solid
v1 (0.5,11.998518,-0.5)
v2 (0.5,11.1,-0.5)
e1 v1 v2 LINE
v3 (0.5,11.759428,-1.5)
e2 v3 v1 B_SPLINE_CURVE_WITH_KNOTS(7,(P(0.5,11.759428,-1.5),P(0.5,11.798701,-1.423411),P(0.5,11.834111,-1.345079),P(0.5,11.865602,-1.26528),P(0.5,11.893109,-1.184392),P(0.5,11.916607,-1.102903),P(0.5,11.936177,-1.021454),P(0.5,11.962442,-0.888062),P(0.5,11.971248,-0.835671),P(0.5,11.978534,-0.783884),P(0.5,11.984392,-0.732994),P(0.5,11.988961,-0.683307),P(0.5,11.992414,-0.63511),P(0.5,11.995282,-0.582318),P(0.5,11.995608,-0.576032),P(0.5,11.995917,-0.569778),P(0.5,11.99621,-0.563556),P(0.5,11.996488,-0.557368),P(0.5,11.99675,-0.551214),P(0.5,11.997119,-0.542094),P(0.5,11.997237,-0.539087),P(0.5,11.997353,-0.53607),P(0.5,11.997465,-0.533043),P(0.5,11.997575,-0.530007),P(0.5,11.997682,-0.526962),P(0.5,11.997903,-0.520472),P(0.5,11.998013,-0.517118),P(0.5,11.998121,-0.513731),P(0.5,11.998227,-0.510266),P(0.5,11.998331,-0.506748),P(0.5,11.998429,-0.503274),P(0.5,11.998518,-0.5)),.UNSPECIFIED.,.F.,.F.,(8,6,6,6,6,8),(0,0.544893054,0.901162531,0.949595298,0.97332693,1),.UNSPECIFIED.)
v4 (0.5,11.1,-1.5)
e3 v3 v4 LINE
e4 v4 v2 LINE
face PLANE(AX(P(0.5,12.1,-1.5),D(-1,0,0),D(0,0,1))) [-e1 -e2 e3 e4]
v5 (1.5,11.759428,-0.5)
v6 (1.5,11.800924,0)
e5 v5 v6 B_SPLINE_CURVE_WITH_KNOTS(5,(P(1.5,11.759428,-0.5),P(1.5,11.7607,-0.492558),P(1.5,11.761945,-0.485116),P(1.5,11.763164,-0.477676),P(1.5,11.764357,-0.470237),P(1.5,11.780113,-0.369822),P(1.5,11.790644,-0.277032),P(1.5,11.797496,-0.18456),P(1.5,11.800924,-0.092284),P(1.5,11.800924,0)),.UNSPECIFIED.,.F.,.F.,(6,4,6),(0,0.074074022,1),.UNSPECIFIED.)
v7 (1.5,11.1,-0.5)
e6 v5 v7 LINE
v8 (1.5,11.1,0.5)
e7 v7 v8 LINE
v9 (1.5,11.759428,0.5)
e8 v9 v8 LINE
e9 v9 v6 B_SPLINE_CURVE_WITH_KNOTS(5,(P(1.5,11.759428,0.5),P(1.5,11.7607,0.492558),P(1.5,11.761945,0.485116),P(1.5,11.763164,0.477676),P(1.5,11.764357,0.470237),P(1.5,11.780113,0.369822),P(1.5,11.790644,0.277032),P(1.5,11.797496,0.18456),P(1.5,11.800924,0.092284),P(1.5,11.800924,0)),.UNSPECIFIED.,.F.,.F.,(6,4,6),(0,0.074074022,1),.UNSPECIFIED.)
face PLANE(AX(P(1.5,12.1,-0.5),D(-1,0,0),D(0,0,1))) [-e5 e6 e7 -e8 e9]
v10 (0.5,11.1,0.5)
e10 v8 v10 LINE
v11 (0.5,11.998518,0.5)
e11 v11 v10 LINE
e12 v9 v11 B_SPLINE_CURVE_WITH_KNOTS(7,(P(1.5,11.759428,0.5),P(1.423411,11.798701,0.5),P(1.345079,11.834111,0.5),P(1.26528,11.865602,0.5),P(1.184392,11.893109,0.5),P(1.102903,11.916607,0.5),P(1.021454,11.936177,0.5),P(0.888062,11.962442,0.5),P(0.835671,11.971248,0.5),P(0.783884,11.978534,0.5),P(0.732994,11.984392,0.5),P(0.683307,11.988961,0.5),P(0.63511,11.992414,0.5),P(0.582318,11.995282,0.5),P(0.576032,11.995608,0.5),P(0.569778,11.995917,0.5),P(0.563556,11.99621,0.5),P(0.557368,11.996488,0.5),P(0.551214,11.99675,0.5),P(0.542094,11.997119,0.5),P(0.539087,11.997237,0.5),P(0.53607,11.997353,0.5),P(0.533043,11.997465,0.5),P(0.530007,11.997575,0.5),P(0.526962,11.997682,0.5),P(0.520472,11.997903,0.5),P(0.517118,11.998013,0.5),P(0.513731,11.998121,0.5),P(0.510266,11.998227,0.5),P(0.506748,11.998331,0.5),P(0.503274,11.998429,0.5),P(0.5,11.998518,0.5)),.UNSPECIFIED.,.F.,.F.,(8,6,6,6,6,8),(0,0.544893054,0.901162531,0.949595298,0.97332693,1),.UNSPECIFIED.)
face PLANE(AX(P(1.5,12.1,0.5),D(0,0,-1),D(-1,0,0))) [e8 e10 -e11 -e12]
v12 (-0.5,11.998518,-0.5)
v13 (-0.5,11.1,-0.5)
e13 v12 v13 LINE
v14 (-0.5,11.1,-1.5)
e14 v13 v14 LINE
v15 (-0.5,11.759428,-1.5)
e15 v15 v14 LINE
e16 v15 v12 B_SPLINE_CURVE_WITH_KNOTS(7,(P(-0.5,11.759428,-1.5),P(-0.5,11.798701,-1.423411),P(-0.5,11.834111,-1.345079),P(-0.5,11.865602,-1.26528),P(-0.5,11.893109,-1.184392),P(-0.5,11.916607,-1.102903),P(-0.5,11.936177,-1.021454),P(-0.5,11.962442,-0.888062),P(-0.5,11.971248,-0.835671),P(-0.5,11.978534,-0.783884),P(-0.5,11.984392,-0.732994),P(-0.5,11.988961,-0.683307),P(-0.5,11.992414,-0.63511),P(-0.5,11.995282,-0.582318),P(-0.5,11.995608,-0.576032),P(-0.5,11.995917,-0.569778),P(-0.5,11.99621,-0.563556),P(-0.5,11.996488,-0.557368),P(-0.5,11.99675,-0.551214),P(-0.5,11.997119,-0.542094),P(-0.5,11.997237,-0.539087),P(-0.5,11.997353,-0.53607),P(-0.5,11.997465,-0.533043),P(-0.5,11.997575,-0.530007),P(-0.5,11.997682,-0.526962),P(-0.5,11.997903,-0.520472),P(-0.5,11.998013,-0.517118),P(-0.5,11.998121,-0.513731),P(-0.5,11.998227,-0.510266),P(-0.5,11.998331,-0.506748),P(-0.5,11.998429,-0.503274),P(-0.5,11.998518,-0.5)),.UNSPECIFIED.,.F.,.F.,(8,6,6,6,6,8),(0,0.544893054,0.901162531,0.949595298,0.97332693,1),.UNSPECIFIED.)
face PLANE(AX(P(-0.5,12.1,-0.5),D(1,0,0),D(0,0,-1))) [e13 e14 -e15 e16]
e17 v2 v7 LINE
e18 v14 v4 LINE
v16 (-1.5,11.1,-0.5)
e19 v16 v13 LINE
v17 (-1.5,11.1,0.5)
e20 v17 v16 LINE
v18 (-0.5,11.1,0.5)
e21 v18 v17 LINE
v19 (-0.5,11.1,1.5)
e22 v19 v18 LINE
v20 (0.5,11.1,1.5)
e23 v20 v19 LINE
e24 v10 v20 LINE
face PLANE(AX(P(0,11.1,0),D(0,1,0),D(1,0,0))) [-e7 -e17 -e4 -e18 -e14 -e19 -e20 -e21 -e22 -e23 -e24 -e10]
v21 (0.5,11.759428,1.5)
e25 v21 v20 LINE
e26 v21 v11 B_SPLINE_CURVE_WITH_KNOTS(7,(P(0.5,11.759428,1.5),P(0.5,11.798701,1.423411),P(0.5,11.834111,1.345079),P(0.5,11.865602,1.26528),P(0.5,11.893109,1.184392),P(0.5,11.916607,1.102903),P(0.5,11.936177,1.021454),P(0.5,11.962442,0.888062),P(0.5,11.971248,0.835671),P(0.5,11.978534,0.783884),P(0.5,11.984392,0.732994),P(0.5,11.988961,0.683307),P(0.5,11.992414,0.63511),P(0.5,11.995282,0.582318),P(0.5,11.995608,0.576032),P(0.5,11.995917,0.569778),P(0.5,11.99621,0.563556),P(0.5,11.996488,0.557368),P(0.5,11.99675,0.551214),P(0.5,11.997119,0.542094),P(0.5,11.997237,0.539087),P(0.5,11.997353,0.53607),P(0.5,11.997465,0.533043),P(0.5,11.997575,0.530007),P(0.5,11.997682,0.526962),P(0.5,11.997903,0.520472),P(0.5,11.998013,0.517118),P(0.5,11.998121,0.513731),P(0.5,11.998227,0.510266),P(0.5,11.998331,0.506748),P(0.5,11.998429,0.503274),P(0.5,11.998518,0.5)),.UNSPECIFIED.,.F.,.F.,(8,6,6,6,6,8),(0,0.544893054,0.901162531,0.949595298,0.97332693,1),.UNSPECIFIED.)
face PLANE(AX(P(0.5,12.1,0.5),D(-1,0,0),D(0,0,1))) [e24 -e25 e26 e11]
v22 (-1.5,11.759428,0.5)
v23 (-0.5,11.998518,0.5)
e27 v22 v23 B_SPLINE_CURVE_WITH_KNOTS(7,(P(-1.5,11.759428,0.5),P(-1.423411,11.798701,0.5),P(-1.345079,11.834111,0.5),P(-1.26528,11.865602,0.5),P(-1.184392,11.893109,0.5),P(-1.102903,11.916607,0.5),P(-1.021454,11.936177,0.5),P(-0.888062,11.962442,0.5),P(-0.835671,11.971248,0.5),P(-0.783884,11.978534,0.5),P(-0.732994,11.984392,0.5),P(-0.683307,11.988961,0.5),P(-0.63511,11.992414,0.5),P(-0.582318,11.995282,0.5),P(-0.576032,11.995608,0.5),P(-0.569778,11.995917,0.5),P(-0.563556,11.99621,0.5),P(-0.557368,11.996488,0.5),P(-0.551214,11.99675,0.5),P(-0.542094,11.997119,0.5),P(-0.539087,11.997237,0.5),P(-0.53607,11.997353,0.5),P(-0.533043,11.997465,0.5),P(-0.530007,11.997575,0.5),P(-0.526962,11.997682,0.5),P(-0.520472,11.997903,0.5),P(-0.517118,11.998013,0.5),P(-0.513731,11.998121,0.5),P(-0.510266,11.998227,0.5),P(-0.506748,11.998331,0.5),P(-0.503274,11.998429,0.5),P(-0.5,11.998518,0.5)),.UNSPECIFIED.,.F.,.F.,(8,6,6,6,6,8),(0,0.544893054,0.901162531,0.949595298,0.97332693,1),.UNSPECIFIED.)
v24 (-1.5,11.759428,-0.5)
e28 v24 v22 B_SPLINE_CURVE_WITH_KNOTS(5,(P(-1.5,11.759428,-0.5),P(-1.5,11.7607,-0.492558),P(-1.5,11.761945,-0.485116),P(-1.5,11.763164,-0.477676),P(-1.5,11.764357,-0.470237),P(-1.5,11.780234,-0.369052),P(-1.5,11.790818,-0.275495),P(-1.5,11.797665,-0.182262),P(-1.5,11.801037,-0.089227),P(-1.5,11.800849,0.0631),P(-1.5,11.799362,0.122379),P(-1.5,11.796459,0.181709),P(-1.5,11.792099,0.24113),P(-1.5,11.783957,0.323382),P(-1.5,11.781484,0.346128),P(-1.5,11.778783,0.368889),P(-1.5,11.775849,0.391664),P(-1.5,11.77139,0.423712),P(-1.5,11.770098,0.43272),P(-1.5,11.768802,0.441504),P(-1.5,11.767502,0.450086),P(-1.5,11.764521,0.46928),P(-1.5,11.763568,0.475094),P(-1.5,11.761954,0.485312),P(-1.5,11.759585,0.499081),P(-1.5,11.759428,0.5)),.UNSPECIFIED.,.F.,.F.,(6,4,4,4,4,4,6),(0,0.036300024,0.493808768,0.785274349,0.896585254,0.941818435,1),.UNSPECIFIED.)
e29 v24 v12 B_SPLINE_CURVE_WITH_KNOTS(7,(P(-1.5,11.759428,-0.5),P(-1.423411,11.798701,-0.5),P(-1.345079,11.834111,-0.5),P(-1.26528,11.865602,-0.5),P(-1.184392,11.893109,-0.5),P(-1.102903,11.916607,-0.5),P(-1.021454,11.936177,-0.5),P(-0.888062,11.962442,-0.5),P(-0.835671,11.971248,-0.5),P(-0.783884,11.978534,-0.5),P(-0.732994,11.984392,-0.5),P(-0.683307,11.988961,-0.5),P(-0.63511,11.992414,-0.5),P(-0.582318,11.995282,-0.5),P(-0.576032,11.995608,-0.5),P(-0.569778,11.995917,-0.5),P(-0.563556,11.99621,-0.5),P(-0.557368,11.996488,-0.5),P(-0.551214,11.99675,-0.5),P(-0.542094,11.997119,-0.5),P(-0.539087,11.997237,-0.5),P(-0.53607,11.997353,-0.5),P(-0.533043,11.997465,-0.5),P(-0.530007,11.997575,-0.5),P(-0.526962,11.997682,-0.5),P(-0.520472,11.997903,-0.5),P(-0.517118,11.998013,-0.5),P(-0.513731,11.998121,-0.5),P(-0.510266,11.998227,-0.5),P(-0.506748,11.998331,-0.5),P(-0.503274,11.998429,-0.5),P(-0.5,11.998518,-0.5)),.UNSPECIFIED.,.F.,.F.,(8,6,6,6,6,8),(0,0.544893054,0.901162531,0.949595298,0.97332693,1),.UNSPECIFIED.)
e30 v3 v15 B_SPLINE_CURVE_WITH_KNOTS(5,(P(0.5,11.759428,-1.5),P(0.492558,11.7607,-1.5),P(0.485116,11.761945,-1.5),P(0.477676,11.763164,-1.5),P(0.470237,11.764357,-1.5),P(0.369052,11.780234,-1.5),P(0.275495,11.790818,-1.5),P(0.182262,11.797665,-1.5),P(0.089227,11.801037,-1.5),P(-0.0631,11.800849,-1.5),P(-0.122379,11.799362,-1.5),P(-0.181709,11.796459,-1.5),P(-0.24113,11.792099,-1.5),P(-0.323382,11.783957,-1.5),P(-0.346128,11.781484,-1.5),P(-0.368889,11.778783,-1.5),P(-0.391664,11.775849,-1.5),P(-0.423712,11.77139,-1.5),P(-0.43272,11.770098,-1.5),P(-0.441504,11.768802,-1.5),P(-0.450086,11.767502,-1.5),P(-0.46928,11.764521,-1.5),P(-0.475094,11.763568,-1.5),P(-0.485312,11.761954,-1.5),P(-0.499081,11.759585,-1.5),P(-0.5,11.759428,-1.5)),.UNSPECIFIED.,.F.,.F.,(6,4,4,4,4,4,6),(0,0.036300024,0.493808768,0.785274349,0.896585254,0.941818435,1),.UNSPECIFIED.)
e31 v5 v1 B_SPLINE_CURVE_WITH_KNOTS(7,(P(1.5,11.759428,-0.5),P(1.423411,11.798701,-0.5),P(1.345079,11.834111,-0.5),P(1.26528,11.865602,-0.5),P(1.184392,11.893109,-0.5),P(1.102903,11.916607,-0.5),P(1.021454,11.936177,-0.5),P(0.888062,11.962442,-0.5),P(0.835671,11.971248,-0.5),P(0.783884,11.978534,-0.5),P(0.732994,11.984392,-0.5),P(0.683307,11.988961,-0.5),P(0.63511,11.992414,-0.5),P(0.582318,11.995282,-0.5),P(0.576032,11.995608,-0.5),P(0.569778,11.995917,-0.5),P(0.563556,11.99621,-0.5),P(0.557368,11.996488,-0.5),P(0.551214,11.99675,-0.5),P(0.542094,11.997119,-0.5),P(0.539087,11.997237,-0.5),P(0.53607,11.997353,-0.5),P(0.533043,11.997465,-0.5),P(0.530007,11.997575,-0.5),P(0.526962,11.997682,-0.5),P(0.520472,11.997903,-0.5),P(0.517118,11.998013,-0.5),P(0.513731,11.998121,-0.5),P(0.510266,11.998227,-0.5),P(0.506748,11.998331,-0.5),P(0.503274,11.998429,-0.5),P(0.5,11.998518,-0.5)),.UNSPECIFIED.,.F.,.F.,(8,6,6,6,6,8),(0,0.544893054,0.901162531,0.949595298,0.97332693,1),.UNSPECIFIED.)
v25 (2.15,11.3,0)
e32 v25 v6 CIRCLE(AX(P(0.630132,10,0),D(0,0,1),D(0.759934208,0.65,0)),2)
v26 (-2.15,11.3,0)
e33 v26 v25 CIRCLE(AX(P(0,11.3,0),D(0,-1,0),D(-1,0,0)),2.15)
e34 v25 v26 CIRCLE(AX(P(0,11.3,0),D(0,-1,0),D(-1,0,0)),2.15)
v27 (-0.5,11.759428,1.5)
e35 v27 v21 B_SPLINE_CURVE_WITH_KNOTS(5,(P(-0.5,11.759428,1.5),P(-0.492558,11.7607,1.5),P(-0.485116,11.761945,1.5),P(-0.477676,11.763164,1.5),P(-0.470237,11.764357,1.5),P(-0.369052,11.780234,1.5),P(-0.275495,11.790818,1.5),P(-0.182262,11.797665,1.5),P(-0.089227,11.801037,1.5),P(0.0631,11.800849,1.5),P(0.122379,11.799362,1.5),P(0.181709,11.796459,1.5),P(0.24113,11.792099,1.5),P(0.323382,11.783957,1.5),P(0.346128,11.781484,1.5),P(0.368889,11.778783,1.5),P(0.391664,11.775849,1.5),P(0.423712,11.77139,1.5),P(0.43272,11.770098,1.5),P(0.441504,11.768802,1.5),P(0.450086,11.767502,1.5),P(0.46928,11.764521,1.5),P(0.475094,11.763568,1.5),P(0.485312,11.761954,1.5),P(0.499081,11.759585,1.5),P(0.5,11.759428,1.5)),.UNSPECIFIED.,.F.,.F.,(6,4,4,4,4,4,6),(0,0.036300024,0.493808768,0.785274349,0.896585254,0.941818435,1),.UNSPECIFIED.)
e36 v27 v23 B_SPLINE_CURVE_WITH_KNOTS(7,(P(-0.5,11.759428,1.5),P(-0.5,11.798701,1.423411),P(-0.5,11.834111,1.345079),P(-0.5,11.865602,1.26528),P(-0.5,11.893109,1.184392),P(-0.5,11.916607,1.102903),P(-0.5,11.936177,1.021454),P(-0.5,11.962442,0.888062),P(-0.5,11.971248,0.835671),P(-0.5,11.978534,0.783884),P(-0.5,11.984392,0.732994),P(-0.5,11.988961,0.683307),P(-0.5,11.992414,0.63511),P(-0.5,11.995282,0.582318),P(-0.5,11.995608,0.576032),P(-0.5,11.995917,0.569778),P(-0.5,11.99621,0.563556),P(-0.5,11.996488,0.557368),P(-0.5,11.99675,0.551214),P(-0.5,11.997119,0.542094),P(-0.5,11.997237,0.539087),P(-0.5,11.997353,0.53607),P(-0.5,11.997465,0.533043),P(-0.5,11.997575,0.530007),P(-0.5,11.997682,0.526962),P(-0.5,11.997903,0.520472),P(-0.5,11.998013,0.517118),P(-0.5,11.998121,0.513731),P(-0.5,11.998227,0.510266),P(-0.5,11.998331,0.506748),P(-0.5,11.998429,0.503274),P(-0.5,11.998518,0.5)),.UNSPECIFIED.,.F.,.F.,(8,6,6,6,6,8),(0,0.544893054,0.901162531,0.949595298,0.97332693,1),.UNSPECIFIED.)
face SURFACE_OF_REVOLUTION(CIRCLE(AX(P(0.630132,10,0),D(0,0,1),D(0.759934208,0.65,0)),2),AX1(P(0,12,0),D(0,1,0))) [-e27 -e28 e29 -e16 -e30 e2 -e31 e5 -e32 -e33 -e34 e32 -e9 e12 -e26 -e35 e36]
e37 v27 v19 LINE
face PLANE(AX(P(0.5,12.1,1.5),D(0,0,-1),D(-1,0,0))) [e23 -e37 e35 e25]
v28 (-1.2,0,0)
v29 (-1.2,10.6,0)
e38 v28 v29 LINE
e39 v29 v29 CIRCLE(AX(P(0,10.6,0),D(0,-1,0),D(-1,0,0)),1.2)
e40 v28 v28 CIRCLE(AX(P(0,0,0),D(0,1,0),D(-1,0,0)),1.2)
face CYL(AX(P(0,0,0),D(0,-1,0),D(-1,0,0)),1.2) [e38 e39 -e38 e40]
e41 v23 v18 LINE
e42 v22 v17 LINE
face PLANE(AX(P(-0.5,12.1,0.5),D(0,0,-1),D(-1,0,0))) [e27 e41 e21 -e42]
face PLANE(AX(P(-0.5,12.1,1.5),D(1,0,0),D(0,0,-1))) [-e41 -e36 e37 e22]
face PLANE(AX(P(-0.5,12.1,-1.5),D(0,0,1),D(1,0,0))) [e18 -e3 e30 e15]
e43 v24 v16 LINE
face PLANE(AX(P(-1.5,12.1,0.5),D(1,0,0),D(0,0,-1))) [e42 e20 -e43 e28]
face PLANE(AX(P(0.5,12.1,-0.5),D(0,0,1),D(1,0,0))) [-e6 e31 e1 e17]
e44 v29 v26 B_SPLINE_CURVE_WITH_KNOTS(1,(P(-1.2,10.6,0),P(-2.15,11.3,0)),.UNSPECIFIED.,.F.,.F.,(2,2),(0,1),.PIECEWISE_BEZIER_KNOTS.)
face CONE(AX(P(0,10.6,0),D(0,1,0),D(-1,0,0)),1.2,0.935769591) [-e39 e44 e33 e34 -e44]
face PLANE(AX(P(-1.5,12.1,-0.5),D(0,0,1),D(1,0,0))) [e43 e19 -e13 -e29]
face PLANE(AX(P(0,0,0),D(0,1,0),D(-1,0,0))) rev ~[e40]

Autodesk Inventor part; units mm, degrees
ref_plane "YZ Plane" through (0, 0, 0) normal (1, 0, 0) x (0, 1, 0)
sketch "Sketch1" plane through (0, 0, 0) normal (0, 1, 0) x (-1, 0, 0)
  circle A0 centre (0, 0) radius 1.2
  dimension "d0" = 2.4
extrude "Extrusion1" add sketch "Sketch1" along normal blind 10.6
thread "Thread1" size "M3x0.5" class "6g" standard "ANSI Metric M Profile" length 10 offset 1
ref_plane "Work Plane1" through (0, 11.3, 0) normal (0, 1, 0) x (1, 0, 0)
sketch "Sketch3" plane through (0, 11.3, 0) normal (0, 1, 0) x (1, 0, 0)
  circle A0 centre (0, 0) radius 2.15
  dimension "d6" = 4.3
loft "Loft1" add profiles "Sketch3" section 1 edges at (1.2, 10.6, 0)
sketch "Sketch5" plane through (0, 11.3, 0) normal (0, 1, 0) x (1, 0, 0)
  circle A0 centre (0, 0) radius 2.15
extrude "Extrusion2" add sketch "Sketch5" along normal blind 0.7
fillet "Fillet1" radius 2 1 edges at (-2.15, 12, 0)
ref_plane "Work Plane2" through (0, 12.1, 0) normal (0, 1, 0) x (1, 0, 0)
sketch "Sketch7" plane through (0, 12.1, 0) normal (0, 1, 0) x (1, 0, 0)
  line L0 (-1.5, -0.5) -> (-1.5, 0.5)
  line L1 (1.5, 0.5) -> (1.5, -0.5)
  line L2 (-0.5, 1.5) -> (0.5, 1.5)
  line L3 (0.5, -1.5) -> (-0.5, -1.5)
  line L4 (1.5, -0.5) -> (0.5, -0.5)
  line L5 (-0.5, -0.5) -> (-1.5, -0.5)
  line L6 (0.5, 1.5) -> (0.5, 0.5)
  line L7 (0.5, -0.5) -> (0.5, -1.5)
  line L8 (-1.5, 0.5) -> (-0.5, 0.5)
  line L9 (0.5, 0.5) -> (1.5, 0.5)
  line L10 (-0.5, -1.5) -> (-0.5, -0.5)
  line L11 (-0.5, 0.5) -> (-0.5, 1.5)
  dimension "d22" = 3
  dimension "d23" = 1
  dimension "d24" = 3
  dimension "d25" = 1
extrude "Extrusion4" cut sketch "Sketch7" against normal blind 1
equation "\"BendRadius\" = Thickness"
equation "\"BendReliefWidth\" = Thickness"
equation "\"BendReliefDepth\" = 0.5 * Thickness"
equation "\"CornerReliefSize\" = 4 * Thickness"
equation "\"MinimumRemnant\" = 2 * Thickness"
equation "\"TransitionRadius\" = BendRadius"
equation "\"JacobiRadiusSize\" = BendRadius"
equation "\"GapSize\" = Thickness"
equation "\"Thickness\" = 0.5"
properties part number "Parafuso menor Tarraxa"
